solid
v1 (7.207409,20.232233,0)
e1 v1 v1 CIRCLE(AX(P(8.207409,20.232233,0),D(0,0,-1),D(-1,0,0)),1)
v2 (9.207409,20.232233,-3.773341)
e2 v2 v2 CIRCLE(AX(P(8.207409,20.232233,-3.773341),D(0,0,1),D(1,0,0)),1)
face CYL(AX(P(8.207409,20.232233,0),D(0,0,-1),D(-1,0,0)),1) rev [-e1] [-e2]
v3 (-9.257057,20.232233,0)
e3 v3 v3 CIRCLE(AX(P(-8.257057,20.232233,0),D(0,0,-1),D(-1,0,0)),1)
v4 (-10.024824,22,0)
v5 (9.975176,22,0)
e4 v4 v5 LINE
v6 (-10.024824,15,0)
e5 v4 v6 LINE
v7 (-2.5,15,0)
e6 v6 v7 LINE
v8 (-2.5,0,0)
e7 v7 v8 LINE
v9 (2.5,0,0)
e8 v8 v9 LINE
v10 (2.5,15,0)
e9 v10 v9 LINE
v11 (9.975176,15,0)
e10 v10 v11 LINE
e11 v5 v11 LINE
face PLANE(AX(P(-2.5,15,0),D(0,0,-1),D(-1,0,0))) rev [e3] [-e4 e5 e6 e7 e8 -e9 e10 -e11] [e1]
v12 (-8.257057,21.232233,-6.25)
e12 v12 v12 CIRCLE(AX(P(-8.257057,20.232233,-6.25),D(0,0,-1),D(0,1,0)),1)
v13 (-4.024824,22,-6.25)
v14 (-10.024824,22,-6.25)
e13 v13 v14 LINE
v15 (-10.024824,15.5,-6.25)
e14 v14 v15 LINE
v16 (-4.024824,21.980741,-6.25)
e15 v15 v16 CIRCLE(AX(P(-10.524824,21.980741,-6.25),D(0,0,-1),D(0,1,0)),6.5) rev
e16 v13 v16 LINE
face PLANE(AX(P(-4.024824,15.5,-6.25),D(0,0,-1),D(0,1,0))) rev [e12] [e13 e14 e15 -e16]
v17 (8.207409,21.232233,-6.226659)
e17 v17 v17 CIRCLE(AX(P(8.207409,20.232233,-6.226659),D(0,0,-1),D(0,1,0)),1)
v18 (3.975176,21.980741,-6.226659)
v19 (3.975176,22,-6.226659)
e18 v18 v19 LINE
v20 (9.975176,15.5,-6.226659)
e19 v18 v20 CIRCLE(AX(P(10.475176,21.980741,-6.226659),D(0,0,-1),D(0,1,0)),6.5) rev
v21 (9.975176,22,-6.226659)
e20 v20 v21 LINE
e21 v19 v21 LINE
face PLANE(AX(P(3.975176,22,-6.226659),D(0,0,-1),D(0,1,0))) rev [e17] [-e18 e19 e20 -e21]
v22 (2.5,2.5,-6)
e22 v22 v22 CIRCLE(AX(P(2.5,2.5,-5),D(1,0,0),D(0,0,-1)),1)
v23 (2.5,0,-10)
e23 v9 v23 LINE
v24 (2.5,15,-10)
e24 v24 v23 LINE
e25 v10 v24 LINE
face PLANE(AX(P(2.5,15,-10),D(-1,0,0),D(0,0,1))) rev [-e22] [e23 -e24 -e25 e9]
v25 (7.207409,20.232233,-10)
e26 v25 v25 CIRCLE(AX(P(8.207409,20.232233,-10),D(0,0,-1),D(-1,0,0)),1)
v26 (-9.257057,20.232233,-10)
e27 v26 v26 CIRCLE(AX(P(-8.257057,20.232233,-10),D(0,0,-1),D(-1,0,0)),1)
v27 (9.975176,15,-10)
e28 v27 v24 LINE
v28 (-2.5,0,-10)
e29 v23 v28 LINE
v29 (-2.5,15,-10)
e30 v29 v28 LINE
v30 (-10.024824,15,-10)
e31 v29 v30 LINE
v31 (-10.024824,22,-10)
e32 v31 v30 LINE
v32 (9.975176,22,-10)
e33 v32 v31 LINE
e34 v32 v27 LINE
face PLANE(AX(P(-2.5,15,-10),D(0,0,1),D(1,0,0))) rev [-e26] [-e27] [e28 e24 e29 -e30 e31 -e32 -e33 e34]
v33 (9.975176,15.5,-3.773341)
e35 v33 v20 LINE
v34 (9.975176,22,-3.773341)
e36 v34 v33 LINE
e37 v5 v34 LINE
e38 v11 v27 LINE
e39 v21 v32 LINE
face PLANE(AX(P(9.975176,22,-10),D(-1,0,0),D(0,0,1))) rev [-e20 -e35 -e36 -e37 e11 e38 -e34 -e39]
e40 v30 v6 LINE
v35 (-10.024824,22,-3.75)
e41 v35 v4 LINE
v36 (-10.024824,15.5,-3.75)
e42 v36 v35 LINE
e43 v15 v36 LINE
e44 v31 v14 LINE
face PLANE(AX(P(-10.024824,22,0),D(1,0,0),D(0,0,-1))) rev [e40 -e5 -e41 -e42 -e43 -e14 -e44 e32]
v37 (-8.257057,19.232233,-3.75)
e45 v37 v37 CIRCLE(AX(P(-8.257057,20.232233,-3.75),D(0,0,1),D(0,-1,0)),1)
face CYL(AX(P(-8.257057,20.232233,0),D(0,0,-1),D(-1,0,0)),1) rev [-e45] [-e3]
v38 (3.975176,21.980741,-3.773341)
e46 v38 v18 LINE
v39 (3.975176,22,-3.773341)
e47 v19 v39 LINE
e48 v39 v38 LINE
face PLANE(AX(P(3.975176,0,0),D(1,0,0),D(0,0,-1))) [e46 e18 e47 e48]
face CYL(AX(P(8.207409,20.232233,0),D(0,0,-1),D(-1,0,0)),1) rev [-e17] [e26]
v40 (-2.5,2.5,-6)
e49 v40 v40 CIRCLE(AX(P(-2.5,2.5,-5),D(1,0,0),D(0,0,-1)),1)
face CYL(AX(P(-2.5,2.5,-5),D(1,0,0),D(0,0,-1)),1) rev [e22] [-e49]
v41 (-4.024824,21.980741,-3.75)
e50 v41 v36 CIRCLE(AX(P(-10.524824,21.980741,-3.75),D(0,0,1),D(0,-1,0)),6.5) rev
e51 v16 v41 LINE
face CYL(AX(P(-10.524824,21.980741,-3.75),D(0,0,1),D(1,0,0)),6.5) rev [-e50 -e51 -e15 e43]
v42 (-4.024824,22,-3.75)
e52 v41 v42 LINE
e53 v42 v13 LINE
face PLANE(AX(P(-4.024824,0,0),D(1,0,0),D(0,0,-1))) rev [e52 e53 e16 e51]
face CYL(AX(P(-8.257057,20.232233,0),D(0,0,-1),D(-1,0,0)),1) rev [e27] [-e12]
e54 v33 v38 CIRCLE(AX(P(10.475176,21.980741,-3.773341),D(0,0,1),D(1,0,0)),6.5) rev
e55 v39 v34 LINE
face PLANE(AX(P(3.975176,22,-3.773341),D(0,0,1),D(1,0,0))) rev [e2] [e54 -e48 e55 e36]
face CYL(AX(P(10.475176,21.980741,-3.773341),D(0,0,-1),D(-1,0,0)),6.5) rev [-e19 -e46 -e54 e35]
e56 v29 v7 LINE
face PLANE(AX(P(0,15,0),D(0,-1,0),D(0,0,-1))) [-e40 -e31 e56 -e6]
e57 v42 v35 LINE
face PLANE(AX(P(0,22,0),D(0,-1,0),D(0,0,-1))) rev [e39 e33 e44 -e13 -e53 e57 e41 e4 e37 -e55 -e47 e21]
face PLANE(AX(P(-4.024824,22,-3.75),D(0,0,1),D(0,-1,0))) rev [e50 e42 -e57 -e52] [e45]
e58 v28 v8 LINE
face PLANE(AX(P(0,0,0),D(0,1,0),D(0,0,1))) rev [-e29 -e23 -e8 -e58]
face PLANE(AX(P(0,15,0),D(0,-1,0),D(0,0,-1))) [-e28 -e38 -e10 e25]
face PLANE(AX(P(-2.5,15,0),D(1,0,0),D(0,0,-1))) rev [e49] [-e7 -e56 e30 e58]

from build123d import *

# Parameters (mm, degrees)
CROQUIS2_W              = 5
CROQUIS2_H              = 10
SALIENTE_EXTRUIR1_DEPTH = 15
CROQUIS3_R              = 1
CORTAR_EXTRUIR1_DEPTH   = 19.708286934
CROQUIS4_W              = 20
CROQUIS4_H              = 10
SALIENTE_EXTRUIR2_DEPTH = 7
CROQUIS5_W              = 2.5
CROQUIS5_H              = 6.5
CORTAR_EXTRUIR2_DEPTH   = 6
CROQUIS6_R              = 1
CORTAR_EXTRUIR3_DEPTH   = 27.162895312
CROQUIS7_W              = 2.453318502
CROQUIS7_H              = 6.5
CORTAR_EXTRUIR4_DEPTH   = 6
CROQUIS8_R              = 1
CORTAR_EXTRUIR5_DEPTH   = 27.162895312
REDONDEO1_R             = 6.5


with BuildPart() as part:
    # Croquis2 → Saliente-Extruir1 (new body)
    with BuildSketch(Plane(origin=(0, 0, 0), x_dir=(1, 0, 0), z_dir=(0, 1, 0))):
        with Locations((0, 5)):
            Rectangle(CROQUIS2_W, CROQUIS2_H)
    extrude(amount=SALIENTE_EXTRUIR1_DEPTH)

    # Croquis3 → Cortar-Extruir1 (cut, through all)
    with BuildSketch(Plane(origin=(2.5, 0, 0), x_dir=(0, 0, -1), z_dir=(1, 0, 0))):
        with Locations((5, 2.5)):
            Circle(CROQUIS3_R)
    extrude(amount=-CORTAR_EXTRUIR1_DEPTH, mode=Mode.SUBTRACT)

    # Croquis4 → Saliente-Extruir2 (add)
    with BuildSketch(Plane(origin=(0, 15, 0), x_dir=(1, 0, 0), z_dir=(0, 1, 0))):
        with Locations((-0.024823745, 5)):
            Rectangle(CROQUIS4_W, CROQUIS4_H)
    extrude(amount=SALIENTE_EXTRUIR2_DEPTH)

    # Croquis5 → Cortar-Extruir2 (cut)
    with BuildSketch(Plane.ZY.offset(10.024823745)):
        with Locations((-5, 18.75)):
            Rectangle(CROQUIS5_W, CROQUIS5_H)
    extrude(amount=-CORTAR_EXTRUIR2_DEPTH, mode=Mode.SUBTRACT)

    # Croquis6 → Cortar-Extruir3 (cut, through all)
    with BuildSketch(Plane(origin=(0, 0, -10), x_dir=(-1, 0, 0), z_dir=(0, 0, -1))):
        with Locations((8.257056792, 20.232233047)):
            Circle(CROQUIS6_R)
    extrude(amount=-CORTAR_EXTRUIR3_DEPTH, mode=Mode.SUBTRACT)

    # Croquis7 → Cortar-Extruir4 (cut)
    with BuildSketch(Plane(origin=(9.975176255, 0, 0), x_dir=(0, 0, -1), z_dir=(1, 0, 0))):
        with Locations((5, 18.75)):
            Rectangle(CROQUIS7_W, CROQUIS7_H)
    extrude(amount=-CORTAR_EXTRUIR4_DEPTH, mode=Mode.SUBTRACT)

    # Croquis8 → Cortar-Extruir5 (cut, through all)
    with BuildSketch(Plane(origin=(0, 0, -10), x_dir=(-1, 0, 0), z_dir=(0, 0, -1))):
        with Locations((-8.207409302, 20.232233047)):
            Circle(CROQUIS8_R)
    extrude(amount=-CORTAR_EXTRUIR5_DEPTH, mode=Mode.SUBTRACT)

    # Redondeo1
    # the kernel refuses this fillet: 6.5 mm, written as the material it adds along each edge
    with BuildSketch(Plane(origin=(-4.024823745, 15.5, -3.75), x_dir=(-1, 0, 0), z_dir=(0, 0, -1))) as redondeo1_piece_1:
        with BuildLine():
            CenterArc((6.5, 6.480740698), REDONDEO1_R, 180, 85.588274214)
            Line((0, 6.480740698), (-0.13, 6.480740698))
            Line((-0.13, 6.480740698), (-0.13, 0))
            Line((-0.13, 0), (0, -0.13))
            ThreePointArc((0, -0.13), (3, -0.13), (5.99, -0.129614814))
            Line((5.99, -0.129614814), (6, 0))
        make_face()
    extrude(amount=2.5)
    with BuildSketch(Plane(origin=(3.975176255, 15.5, -6.226659251), x_dir=(0, 1, 0), z_dir=(0, 0, 1))) as redondeo1_piece_2:
        with BuildLine():
            CenterArc((6.480740698, -6.5), REDONDEO1_R, 90, 85.588274214)
            Line((0, -6), (-0.129614814, -5.99))
            ThreePointArc((-0.129614814, -5.99), (-0.13, -3), (-0.13, 0))
            Line((-0.13, 0), (0, 0.13))
            Line((0, 0.13), (6.480740698, 0.13))
            Line((6.480740698, 0.13), (6.480740698, 0))
        make_face()
    extrude(amount=2.453318501)


solid = part.part
